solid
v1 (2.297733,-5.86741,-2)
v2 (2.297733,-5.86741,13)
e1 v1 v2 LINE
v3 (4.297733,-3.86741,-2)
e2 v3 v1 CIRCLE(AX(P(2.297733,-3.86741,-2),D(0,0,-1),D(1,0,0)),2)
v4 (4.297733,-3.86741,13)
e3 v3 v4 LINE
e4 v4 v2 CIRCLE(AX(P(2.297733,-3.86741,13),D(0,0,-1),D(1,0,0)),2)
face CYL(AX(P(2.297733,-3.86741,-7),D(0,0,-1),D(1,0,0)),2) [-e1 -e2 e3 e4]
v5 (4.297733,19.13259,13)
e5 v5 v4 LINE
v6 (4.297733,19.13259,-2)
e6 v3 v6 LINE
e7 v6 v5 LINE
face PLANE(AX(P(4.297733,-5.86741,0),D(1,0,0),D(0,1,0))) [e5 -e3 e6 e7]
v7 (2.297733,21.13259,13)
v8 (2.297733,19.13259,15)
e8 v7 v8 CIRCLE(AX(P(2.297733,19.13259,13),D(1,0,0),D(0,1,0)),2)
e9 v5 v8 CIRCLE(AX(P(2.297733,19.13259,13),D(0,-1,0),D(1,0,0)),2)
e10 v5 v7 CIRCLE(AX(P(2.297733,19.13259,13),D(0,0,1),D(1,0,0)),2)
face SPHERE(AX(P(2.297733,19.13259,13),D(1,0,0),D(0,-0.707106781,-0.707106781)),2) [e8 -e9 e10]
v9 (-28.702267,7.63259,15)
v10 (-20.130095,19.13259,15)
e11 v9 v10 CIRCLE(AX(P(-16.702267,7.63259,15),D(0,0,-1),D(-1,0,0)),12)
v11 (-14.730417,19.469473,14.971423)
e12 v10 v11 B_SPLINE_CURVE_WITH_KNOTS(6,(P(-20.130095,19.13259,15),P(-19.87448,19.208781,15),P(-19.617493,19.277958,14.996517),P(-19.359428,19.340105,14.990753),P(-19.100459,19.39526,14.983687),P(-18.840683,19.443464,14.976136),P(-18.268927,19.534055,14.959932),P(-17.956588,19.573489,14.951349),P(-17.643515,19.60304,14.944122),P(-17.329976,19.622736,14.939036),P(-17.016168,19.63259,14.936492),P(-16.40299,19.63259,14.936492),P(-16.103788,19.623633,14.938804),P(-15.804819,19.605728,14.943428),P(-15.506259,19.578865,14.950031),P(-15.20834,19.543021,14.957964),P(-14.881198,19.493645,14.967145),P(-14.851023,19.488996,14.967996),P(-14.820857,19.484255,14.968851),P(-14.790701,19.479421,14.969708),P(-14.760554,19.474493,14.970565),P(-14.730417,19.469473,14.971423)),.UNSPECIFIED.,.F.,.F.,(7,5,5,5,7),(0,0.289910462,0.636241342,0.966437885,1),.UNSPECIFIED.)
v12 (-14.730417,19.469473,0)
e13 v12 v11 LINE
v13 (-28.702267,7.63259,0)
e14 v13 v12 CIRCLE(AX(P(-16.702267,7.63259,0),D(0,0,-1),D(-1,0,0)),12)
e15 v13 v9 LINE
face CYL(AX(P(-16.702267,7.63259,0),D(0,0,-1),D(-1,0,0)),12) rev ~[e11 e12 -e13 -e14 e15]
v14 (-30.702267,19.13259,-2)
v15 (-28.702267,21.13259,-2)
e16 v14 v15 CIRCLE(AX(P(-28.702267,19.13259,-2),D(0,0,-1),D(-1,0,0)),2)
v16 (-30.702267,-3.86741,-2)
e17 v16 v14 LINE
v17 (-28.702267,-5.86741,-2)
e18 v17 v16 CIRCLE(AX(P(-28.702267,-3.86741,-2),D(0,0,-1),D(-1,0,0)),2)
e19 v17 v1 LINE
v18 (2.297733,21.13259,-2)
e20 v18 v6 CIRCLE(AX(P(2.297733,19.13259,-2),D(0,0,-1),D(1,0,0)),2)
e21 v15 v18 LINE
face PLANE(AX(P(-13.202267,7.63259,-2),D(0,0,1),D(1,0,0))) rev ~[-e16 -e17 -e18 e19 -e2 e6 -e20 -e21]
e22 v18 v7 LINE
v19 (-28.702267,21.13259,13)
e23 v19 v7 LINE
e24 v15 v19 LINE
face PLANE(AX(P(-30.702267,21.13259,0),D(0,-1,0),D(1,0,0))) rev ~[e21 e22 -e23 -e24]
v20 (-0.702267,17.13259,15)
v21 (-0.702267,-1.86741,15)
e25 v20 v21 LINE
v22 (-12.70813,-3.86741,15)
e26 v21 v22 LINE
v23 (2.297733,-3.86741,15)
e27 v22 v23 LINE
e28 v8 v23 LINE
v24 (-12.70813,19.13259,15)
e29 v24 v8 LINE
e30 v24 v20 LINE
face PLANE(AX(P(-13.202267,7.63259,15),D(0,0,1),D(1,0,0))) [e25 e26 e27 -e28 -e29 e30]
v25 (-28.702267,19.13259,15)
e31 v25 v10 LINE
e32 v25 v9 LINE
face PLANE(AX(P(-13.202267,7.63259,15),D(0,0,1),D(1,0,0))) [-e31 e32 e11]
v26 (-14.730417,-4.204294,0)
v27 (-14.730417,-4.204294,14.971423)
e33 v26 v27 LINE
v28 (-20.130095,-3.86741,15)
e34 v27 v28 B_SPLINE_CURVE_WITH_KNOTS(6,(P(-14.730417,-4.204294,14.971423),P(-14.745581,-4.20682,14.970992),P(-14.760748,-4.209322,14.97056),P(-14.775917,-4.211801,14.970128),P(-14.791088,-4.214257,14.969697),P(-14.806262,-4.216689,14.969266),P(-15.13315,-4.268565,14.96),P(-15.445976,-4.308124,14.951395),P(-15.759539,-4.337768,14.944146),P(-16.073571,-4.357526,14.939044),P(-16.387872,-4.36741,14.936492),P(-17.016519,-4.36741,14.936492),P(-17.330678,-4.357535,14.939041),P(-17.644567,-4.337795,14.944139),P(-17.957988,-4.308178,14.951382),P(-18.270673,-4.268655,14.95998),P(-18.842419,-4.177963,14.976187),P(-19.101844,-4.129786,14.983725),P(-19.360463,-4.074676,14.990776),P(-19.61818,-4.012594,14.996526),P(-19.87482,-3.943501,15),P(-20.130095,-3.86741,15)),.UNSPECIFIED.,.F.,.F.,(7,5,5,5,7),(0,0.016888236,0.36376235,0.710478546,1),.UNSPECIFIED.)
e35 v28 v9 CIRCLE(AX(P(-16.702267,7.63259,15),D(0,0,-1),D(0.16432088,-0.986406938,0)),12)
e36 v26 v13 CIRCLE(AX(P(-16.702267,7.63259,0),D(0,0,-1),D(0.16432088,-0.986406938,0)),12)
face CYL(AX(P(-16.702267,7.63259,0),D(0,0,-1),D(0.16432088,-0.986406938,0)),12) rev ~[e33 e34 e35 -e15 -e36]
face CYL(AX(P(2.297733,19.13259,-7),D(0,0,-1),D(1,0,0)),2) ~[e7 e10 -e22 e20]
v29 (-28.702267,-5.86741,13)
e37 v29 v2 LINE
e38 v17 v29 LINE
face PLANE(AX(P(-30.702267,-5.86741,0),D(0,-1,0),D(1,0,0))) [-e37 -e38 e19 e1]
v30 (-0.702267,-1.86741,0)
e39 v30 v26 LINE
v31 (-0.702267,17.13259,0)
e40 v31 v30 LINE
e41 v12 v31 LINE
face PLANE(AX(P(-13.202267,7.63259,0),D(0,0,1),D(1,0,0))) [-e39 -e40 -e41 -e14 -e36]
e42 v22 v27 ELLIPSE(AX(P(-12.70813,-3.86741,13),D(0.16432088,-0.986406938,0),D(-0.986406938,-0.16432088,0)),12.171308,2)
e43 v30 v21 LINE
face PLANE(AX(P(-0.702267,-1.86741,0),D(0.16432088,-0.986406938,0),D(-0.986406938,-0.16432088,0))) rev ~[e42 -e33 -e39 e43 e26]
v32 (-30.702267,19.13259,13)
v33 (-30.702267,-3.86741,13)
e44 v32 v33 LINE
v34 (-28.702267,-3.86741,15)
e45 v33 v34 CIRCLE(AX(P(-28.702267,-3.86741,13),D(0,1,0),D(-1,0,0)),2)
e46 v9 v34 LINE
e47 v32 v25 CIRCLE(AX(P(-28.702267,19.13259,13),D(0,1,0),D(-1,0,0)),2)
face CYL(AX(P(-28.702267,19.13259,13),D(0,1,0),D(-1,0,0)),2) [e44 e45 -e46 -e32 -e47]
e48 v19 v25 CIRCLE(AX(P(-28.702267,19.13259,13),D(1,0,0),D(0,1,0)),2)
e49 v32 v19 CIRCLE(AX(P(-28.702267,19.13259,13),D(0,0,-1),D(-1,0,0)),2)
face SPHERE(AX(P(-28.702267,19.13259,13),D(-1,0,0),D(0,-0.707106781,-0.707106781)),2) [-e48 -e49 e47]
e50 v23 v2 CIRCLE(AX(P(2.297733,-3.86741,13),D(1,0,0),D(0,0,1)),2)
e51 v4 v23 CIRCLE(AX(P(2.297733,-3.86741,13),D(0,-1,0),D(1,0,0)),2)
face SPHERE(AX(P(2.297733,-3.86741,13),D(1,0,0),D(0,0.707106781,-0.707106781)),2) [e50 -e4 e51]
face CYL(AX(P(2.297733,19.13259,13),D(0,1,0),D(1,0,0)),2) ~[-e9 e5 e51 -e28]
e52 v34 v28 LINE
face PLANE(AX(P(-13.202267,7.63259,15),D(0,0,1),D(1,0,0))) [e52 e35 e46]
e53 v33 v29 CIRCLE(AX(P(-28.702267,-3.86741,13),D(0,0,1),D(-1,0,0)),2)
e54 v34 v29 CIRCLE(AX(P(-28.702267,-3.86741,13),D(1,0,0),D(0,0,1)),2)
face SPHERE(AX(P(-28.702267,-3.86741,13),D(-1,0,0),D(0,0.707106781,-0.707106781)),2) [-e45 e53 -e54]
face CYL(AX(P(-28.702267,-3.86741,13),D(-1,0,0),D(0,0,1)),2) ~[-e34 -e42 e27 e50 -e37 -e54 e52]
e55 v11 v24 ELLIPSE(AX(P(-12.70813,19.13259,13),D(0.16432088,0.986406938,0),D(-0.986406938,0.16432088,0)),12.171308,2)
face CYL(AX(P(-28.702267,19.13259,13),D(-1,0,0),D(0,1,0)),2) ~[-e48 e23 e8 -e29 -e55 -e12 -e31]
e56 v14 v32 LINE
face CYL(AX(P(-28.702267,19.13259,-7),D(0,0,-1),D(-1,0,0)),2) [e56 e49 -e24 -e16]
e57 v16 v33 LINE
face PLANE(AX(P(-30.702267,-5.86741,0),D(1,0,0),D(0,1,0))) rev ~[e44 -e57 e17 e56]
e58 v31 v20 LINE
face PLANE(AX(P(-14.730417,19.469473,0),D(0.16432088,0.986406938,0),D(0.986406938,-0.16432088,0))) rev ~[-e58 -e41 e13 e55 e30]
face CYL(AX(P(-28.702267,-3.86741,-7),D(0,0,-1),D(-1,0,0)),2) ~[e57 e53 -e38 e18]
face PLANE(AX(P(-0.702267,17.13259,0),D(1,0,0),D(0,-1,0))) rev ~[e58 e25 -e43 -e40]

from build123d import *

# Parameters (mm, degrees)
F0_W         = 35
F0_H         = 27
F1_DEPTH     = 15
F2_DEPTH     = 2
F3_T1_DEPTH  = 20
F3_T3_DEPTH  = 23
F3_T5_DEPTH  = 31
F3_S9_W      = 2
F3_S9_H      = 2
F3_T10_DEPTH = 2
F3_S15_W     = 2
F3_S15_H     = 2
F3_T16_DEPTH = 2
F3_S21_W     = 2
F3_S21_H     = 2
F3_T22_DEPTH = 2
F3_S27_W     = 2
F3_S27_H     = 2
F3_T28_DEPTH = 2


# Not quite as in the source:
# - a fillet or chamfer that OpenCascade refuses, or shapes differently, is made with other operations: its cross-section is extruded or revolved along the edge and cut away or added


with BuildPart() as f1:
    # F0 (on Top) → F1 (new body)
    with BuildSketch(Plane.XY):
        with Locations((-13.2022674233, 7.6325895488)):
            Rectangle(F0_W, F0_H)
        with BuildLine():
            Line((-14.73041686, 19.4694728107), (-0.7022674233, 17.1325895488))
            Line((-0.7022674233, 17.1325895488), (-0.7022674233, 7.6325895488))
            Line((-0.7022674233, 7.6325895488), (-0.7022674233, -1.8674104512))
            Line((-0.7022674233, -1.8674104512), (-14.73041686, -4.2042937131))
            ThreePointArc((-14.73041686, -4.2042937131), (-24.4591286842, -1.5233431387), (-28.7022674233, 7.6325895488))
            ThreePointArc((-28.7022674233, 7.6325895488), (-24.4591286842, 16.7885222364), (-14.73041686, 19.4694728107))
        make_face(mode=Mode.SUBTRACT)
    extrude(amount=F1_DEPTH)

    # F0 (on Top) → F2 (join)
    with BuildSketch(Plane.XY):
        with Locations((-13.2022674233, 7.6325895488)):
            Rectangle(F0_W, F0_H)
        with BuildLine():
            Line((-14.73041686, 19.4694728107), (-0.7022674233, 17.1325895488))
            Line((-0.7022674233, 17.1325895488), (-0.7022674233, 7.6325895488))
            Line((-0.7022674233, 7.6325895488), (-0.7022674233, -1.8674104512))
            Line((-0.7022674233, -1.8674104512), (-14.73041686, -4.2042937131))
            ThreePointArc((-14.73041686, -4.2042937131), (-24.4591286842, -1.5233431387), (-28.7022674233, 7.6325895488))
            ThreePointArc((-28.7022674233, 7.6325895488), (-24.4591286842, 16.7885222364), (-14.73041686, 19.4694728107))
        make_face(mode=Mode.SUBTRACT)
        with BuildLine():
            ThreePointArc((-14.73041686, -4.2042937131), (-7.5463347357, -0.1242717121), (-4.7022674233, 7.6325895488))
            Line((-4.7022674233, 7.6325895488), (-28.7022674233, 7.6325895488))
            ThreePointArc((-28.7022674233, 7.6325895488), (-24.4591286842, -1.5233431387), (-14.73041686, -4.2042937131))
        make_face()
        with BuildLine():
            ThreePointArc((-4.7022674233, 7.6325895488), (-7.5463347357, 15.3894508097), (-14.73041686, 19.4694728107))
            ThreePointArc((-14.73041686, 19.4694728107), (-24.4591286842, 16.7885222364), (-28.7022674233, 7.6325895488))
            Line((-28.7022674233, 7.6325895488), (-4.7022674233, 7.6325895488))
        make_face()
        with BuildLine():
            Line((-0.7022674233, 7.6325895488), (-0.7022674233, 17.1325895488))
            Line((-0.7022674233, 17.1325895488), (-14.73041686, 19.4694728107))
            ThreePointArc((-14.73041686, 19.4694728107), (-7.5463347357, 15.3894508097), (-4.7022674233, 7.6325895488))
            Line((-4.7022674233, 7.6325895488), (-0.7022674233, 7.6325895488))
        make_face()
        with BuildLine():
            Line((-0.7022674233, -1.8674104512), (-0.7022674233, 7.6325895488))
            Line((-0.7022674233, 7.6325895488), (-4.7022674233, 7.6325895488))
            ThreePointArc((-4.7022674233, 7.6325895488), (-7.5463347357, -0.1242717121), (-14.73041686, -4.2042937131))
            Line((-14.73041686, -4.2042937131), (-0.7022674233, -1.8674104512))
        make_face()
    extrude(amount=-F2_DEPTH)

    # F3: fillet of radius 2 on 8 edges, made by hand

    # F3_s2 → F3_t1 (cut)
    with BuildSketch(Plane.XY.offset(-7)):
        with BuildLine():
            ThreePointArc((-30.7022674233, -3.8674104512), (-30.1164809856, -5.2816240135), (-28.7022674233, -5.8674104512))
            Line((-28.7022674233, -5.8674104512), (-30.7022674233, -5.8674104512))
            Line((-30.7022674233, -5.8674104512), (-30.7022674233, -3.8674104512))
        make_face()
        with BuildLine():
            ThreePointArc((-30.7022674233, 19.1325895488), (-30.1164809856, 20.5468031112), (-28.7022674233, 21.1325895488))
            Line((-28.7022674233, 21.1325895488), (-30.7022674233, 21.1325895488))
            Line((-30.7022674233, 21.1325895488), (-30.7022674233, 19.1325895488))
        make_face()
        with BuildLine():
            ThreePointArc((4.2977325767, -3.8674104512), (3.7119461391, -5.2816240135), (2.2977325767, -5.8674104512))
            Line((2.2977325767, -5.8674104512), (4.2977325767, -5.8674104512))
            Line((4.2977325767, -5.8674104512), (4.2977325767, -3.8674104512))
        make_face()
        with BuildLine():
            ThreePointArc((4.2977325767, 19.1325895488), (3.7119461391, 20.5468031112), (2.2977325767, 21.1325895488))
            Line((2.2977325767, 21.1325895488), (4.2977325767, 21.1325895488))
            Line((4.2977325767, 21.1325895488), (4.2977325767, 19.1325895488))
        make_face()
    extrude(amount=F3_T1_DEPTH, mode=Mode.SUBTRACT)

    # F3_s4 → F3_t3 (cut)
    with BuildSketch(Plane.XZ.offset(-19.1325895488)):
        with BuildLine():
            ThreePointArc((-30.7022674233, 13), (-30.1164809856, 14.4142135624), (-28.7022674233, 15))
            Line((-28.7022674233, 15), (-30.7022674233, 15))
            Line((-30.7022674233, 15), (-30.7022674233, 13))
        make_face()
        with BuildLine():
            ThreePointArc((4.2977325767, 13), (3.7119461391, 14.4142135624), (2.2977325767, 15))
            Line((2.2977325767, 15), (4.2977325767, 15))
            Line((4.2977325767, 15), (4.2977325767, 13))
        make_face()
    extrude(amount=F3_T3_DEPTH, mode=Mode.SUBTRACT)

    # F3_s6 → F3_t5 (cut)
    with BuildSketch(Plane.YZ.offset(-28.7022674233)):
        with BuildLine():
            ThreePointArc((21.1325895488, 13), (20.5468031112, 14.4142135624), (19.1325895488, 15))
            Line((19.1325895488, 15), (21.1325895488, 15))
            Line((21.1325895488, 15), (21.1325895488, 13))
        make_face()
        with BuildLine():
            ThreePointArc((-3.8674104512, 15), (-5.2816240135, 14.4142135624), (-5.8674104512, 13))
            Line((-5.8674104512, 13), (-5.8674104512, 15))
            Line((-5.8674104512, 15), (-3.8674104512, 15))
        make_face()
    extrude(amount=F3_T5_DEPTH, mode=Mode.SUBTRACT)


with BuildPart() as f3_tool8:
    # F3_s9 → F3_t10 (new body)
    with BuildSketch(Plane.YZ.offset(-28.7022674233)):
        with Locations((-4.8674104512, 14)):
            Rectangle(F3_S9_W, F3_S9_H)
    extrude(amount=-F3_T10_DEPTH)

    # F3_s11 → F3_t12 (revolve, cut)
    with BuildSketch(Plane(origin=(-28.7022674233, -3.8674104512, 13), x_dir=(0, 0.7071067812, -0.7071067812), z_dir=(0, 0.7071067812, 0.7071067812))):
        with BuildLine():
            ThreePointArc((0, -2), (2, 0), (0, 2))
            Line((0, 2), (0, -2))
        make_face()
    revolve(axis=Axis((-28.7022674233, -3.8674104512, 13), (-1, 0, 0)), mode=Mode.SUBTRACT)


with BuildPart() as f1_1:
    add(f1.part)

    # F3_t7: cut F3_tool8
    add(f3_tool8.part, mode=Mode.SUBTRACT)


with BuildPart() as f3_tool14:
    # F3_s15 → F3_t16 (new body)
    with BuildSketch(Plane.YZ.offset(-28.7022674233)):
        with Locations((20.1325895488, 14)):
            Rectangle(F3_S15_W, F3_S15_H)
    extrude(amount=-F3_T16_DEPTH)

    # F3_s17 → F3_t18 (revolve, cut)
    with BuildSketch(Plane(origin=(-28.7022674233, 19.1325895488, 13), x_dir=(0, -0.7071067812, -0.7071067812), z_dir=(0, 0.7071067812, -0.7071067812))):
        with BuildLine():
            ThreePointArc((0, -2), (2, 0), (0, 2))
            Line((0, 2), (0, -2))
        make_face()
    revolve(axis=Axis((-28.7022674233, 19.1325895488, 13), (-1, 0, 0)), mode=Mode.SUBTRACT)


with BuildPart() as f1_2:
    add(f1_1.part)

    # F3_t13: cut F3_tool14
    add(f3_tool14.part, mode=Mode.SUBTRACT)


with BuildPart() as f3_tool20:
    # F3_s21 → F3_t22 (new body)
    with BuildSketch(Plane.YZ.offset(2.2977325767)):
        with Locations((20.1325895488, 14)):
            Rectangle(F3_S21_W, F3_S21_H)
    extrude(amount=F3_T22_DEPTH)

    # F3_s23 → F3_t24 (revolve, cut)
    with BuildSketch(Plane(origin=(2.2977325767, 19.1325895488, 13), x_dir=(0, -0.7071067812, -0.7071067812), z_dir=(0, -0.7071067812, 0.7071067812))):
        with BuildLine():
            ThreePointArc((0, -2), (2, 0), (0, 2))
            Line((0, 2), (0, -2))
        make_face()
    revolve(axis=Axis((2.2977325767, 19.1325895488, 13), (1, 0, 0)), mode=Mode.SUBTRACT)


with BuildPart() as f1_3:
    add(f1_2.part)

    # F3_t19: cut F3_tool20
    add(f3_tool20.part, mode=Mode.SUBTRACT)


with BuildPart() as f3_tool26:
    # F3_s27 → F3_t28 (new body)
    with BuildSketch(Plane.YZ.offset(2.2977325767)):
        with Locations((-4.8674104512, 14)):
            Rectangle(F3_S27_W, F3_S27_H)
    extrude(amount=F3_T28_DEPTH)

    # F3_s29 → F3_t30 (revolve, cut)
    with BuildSketch(Plane(origin=(2.2977325767, -3.8674104512, 13), x_dir=(0, 0.7071067812, -0.7071067812), z_dir=(0, -0.7071067812, -0.7071067812))):
        with BuildLine():
            ThreePointArc((0, -2), (2, 0), (0, 2))
            Line((0, 2), (0, -2))
        make_face()
    revolve(axis=Axis((2.2977325767, -3.8674104512, 13), (1, 0, 0)), mode=Mode.SUBTRACT)


with BuildPart() as f1_4:
    add(f1_3.part)

    # F3_t25: cut F3_tool26
    add(f3_tool26.part, mode=Mode.SUBTRACT)


solid = f1_4.part
